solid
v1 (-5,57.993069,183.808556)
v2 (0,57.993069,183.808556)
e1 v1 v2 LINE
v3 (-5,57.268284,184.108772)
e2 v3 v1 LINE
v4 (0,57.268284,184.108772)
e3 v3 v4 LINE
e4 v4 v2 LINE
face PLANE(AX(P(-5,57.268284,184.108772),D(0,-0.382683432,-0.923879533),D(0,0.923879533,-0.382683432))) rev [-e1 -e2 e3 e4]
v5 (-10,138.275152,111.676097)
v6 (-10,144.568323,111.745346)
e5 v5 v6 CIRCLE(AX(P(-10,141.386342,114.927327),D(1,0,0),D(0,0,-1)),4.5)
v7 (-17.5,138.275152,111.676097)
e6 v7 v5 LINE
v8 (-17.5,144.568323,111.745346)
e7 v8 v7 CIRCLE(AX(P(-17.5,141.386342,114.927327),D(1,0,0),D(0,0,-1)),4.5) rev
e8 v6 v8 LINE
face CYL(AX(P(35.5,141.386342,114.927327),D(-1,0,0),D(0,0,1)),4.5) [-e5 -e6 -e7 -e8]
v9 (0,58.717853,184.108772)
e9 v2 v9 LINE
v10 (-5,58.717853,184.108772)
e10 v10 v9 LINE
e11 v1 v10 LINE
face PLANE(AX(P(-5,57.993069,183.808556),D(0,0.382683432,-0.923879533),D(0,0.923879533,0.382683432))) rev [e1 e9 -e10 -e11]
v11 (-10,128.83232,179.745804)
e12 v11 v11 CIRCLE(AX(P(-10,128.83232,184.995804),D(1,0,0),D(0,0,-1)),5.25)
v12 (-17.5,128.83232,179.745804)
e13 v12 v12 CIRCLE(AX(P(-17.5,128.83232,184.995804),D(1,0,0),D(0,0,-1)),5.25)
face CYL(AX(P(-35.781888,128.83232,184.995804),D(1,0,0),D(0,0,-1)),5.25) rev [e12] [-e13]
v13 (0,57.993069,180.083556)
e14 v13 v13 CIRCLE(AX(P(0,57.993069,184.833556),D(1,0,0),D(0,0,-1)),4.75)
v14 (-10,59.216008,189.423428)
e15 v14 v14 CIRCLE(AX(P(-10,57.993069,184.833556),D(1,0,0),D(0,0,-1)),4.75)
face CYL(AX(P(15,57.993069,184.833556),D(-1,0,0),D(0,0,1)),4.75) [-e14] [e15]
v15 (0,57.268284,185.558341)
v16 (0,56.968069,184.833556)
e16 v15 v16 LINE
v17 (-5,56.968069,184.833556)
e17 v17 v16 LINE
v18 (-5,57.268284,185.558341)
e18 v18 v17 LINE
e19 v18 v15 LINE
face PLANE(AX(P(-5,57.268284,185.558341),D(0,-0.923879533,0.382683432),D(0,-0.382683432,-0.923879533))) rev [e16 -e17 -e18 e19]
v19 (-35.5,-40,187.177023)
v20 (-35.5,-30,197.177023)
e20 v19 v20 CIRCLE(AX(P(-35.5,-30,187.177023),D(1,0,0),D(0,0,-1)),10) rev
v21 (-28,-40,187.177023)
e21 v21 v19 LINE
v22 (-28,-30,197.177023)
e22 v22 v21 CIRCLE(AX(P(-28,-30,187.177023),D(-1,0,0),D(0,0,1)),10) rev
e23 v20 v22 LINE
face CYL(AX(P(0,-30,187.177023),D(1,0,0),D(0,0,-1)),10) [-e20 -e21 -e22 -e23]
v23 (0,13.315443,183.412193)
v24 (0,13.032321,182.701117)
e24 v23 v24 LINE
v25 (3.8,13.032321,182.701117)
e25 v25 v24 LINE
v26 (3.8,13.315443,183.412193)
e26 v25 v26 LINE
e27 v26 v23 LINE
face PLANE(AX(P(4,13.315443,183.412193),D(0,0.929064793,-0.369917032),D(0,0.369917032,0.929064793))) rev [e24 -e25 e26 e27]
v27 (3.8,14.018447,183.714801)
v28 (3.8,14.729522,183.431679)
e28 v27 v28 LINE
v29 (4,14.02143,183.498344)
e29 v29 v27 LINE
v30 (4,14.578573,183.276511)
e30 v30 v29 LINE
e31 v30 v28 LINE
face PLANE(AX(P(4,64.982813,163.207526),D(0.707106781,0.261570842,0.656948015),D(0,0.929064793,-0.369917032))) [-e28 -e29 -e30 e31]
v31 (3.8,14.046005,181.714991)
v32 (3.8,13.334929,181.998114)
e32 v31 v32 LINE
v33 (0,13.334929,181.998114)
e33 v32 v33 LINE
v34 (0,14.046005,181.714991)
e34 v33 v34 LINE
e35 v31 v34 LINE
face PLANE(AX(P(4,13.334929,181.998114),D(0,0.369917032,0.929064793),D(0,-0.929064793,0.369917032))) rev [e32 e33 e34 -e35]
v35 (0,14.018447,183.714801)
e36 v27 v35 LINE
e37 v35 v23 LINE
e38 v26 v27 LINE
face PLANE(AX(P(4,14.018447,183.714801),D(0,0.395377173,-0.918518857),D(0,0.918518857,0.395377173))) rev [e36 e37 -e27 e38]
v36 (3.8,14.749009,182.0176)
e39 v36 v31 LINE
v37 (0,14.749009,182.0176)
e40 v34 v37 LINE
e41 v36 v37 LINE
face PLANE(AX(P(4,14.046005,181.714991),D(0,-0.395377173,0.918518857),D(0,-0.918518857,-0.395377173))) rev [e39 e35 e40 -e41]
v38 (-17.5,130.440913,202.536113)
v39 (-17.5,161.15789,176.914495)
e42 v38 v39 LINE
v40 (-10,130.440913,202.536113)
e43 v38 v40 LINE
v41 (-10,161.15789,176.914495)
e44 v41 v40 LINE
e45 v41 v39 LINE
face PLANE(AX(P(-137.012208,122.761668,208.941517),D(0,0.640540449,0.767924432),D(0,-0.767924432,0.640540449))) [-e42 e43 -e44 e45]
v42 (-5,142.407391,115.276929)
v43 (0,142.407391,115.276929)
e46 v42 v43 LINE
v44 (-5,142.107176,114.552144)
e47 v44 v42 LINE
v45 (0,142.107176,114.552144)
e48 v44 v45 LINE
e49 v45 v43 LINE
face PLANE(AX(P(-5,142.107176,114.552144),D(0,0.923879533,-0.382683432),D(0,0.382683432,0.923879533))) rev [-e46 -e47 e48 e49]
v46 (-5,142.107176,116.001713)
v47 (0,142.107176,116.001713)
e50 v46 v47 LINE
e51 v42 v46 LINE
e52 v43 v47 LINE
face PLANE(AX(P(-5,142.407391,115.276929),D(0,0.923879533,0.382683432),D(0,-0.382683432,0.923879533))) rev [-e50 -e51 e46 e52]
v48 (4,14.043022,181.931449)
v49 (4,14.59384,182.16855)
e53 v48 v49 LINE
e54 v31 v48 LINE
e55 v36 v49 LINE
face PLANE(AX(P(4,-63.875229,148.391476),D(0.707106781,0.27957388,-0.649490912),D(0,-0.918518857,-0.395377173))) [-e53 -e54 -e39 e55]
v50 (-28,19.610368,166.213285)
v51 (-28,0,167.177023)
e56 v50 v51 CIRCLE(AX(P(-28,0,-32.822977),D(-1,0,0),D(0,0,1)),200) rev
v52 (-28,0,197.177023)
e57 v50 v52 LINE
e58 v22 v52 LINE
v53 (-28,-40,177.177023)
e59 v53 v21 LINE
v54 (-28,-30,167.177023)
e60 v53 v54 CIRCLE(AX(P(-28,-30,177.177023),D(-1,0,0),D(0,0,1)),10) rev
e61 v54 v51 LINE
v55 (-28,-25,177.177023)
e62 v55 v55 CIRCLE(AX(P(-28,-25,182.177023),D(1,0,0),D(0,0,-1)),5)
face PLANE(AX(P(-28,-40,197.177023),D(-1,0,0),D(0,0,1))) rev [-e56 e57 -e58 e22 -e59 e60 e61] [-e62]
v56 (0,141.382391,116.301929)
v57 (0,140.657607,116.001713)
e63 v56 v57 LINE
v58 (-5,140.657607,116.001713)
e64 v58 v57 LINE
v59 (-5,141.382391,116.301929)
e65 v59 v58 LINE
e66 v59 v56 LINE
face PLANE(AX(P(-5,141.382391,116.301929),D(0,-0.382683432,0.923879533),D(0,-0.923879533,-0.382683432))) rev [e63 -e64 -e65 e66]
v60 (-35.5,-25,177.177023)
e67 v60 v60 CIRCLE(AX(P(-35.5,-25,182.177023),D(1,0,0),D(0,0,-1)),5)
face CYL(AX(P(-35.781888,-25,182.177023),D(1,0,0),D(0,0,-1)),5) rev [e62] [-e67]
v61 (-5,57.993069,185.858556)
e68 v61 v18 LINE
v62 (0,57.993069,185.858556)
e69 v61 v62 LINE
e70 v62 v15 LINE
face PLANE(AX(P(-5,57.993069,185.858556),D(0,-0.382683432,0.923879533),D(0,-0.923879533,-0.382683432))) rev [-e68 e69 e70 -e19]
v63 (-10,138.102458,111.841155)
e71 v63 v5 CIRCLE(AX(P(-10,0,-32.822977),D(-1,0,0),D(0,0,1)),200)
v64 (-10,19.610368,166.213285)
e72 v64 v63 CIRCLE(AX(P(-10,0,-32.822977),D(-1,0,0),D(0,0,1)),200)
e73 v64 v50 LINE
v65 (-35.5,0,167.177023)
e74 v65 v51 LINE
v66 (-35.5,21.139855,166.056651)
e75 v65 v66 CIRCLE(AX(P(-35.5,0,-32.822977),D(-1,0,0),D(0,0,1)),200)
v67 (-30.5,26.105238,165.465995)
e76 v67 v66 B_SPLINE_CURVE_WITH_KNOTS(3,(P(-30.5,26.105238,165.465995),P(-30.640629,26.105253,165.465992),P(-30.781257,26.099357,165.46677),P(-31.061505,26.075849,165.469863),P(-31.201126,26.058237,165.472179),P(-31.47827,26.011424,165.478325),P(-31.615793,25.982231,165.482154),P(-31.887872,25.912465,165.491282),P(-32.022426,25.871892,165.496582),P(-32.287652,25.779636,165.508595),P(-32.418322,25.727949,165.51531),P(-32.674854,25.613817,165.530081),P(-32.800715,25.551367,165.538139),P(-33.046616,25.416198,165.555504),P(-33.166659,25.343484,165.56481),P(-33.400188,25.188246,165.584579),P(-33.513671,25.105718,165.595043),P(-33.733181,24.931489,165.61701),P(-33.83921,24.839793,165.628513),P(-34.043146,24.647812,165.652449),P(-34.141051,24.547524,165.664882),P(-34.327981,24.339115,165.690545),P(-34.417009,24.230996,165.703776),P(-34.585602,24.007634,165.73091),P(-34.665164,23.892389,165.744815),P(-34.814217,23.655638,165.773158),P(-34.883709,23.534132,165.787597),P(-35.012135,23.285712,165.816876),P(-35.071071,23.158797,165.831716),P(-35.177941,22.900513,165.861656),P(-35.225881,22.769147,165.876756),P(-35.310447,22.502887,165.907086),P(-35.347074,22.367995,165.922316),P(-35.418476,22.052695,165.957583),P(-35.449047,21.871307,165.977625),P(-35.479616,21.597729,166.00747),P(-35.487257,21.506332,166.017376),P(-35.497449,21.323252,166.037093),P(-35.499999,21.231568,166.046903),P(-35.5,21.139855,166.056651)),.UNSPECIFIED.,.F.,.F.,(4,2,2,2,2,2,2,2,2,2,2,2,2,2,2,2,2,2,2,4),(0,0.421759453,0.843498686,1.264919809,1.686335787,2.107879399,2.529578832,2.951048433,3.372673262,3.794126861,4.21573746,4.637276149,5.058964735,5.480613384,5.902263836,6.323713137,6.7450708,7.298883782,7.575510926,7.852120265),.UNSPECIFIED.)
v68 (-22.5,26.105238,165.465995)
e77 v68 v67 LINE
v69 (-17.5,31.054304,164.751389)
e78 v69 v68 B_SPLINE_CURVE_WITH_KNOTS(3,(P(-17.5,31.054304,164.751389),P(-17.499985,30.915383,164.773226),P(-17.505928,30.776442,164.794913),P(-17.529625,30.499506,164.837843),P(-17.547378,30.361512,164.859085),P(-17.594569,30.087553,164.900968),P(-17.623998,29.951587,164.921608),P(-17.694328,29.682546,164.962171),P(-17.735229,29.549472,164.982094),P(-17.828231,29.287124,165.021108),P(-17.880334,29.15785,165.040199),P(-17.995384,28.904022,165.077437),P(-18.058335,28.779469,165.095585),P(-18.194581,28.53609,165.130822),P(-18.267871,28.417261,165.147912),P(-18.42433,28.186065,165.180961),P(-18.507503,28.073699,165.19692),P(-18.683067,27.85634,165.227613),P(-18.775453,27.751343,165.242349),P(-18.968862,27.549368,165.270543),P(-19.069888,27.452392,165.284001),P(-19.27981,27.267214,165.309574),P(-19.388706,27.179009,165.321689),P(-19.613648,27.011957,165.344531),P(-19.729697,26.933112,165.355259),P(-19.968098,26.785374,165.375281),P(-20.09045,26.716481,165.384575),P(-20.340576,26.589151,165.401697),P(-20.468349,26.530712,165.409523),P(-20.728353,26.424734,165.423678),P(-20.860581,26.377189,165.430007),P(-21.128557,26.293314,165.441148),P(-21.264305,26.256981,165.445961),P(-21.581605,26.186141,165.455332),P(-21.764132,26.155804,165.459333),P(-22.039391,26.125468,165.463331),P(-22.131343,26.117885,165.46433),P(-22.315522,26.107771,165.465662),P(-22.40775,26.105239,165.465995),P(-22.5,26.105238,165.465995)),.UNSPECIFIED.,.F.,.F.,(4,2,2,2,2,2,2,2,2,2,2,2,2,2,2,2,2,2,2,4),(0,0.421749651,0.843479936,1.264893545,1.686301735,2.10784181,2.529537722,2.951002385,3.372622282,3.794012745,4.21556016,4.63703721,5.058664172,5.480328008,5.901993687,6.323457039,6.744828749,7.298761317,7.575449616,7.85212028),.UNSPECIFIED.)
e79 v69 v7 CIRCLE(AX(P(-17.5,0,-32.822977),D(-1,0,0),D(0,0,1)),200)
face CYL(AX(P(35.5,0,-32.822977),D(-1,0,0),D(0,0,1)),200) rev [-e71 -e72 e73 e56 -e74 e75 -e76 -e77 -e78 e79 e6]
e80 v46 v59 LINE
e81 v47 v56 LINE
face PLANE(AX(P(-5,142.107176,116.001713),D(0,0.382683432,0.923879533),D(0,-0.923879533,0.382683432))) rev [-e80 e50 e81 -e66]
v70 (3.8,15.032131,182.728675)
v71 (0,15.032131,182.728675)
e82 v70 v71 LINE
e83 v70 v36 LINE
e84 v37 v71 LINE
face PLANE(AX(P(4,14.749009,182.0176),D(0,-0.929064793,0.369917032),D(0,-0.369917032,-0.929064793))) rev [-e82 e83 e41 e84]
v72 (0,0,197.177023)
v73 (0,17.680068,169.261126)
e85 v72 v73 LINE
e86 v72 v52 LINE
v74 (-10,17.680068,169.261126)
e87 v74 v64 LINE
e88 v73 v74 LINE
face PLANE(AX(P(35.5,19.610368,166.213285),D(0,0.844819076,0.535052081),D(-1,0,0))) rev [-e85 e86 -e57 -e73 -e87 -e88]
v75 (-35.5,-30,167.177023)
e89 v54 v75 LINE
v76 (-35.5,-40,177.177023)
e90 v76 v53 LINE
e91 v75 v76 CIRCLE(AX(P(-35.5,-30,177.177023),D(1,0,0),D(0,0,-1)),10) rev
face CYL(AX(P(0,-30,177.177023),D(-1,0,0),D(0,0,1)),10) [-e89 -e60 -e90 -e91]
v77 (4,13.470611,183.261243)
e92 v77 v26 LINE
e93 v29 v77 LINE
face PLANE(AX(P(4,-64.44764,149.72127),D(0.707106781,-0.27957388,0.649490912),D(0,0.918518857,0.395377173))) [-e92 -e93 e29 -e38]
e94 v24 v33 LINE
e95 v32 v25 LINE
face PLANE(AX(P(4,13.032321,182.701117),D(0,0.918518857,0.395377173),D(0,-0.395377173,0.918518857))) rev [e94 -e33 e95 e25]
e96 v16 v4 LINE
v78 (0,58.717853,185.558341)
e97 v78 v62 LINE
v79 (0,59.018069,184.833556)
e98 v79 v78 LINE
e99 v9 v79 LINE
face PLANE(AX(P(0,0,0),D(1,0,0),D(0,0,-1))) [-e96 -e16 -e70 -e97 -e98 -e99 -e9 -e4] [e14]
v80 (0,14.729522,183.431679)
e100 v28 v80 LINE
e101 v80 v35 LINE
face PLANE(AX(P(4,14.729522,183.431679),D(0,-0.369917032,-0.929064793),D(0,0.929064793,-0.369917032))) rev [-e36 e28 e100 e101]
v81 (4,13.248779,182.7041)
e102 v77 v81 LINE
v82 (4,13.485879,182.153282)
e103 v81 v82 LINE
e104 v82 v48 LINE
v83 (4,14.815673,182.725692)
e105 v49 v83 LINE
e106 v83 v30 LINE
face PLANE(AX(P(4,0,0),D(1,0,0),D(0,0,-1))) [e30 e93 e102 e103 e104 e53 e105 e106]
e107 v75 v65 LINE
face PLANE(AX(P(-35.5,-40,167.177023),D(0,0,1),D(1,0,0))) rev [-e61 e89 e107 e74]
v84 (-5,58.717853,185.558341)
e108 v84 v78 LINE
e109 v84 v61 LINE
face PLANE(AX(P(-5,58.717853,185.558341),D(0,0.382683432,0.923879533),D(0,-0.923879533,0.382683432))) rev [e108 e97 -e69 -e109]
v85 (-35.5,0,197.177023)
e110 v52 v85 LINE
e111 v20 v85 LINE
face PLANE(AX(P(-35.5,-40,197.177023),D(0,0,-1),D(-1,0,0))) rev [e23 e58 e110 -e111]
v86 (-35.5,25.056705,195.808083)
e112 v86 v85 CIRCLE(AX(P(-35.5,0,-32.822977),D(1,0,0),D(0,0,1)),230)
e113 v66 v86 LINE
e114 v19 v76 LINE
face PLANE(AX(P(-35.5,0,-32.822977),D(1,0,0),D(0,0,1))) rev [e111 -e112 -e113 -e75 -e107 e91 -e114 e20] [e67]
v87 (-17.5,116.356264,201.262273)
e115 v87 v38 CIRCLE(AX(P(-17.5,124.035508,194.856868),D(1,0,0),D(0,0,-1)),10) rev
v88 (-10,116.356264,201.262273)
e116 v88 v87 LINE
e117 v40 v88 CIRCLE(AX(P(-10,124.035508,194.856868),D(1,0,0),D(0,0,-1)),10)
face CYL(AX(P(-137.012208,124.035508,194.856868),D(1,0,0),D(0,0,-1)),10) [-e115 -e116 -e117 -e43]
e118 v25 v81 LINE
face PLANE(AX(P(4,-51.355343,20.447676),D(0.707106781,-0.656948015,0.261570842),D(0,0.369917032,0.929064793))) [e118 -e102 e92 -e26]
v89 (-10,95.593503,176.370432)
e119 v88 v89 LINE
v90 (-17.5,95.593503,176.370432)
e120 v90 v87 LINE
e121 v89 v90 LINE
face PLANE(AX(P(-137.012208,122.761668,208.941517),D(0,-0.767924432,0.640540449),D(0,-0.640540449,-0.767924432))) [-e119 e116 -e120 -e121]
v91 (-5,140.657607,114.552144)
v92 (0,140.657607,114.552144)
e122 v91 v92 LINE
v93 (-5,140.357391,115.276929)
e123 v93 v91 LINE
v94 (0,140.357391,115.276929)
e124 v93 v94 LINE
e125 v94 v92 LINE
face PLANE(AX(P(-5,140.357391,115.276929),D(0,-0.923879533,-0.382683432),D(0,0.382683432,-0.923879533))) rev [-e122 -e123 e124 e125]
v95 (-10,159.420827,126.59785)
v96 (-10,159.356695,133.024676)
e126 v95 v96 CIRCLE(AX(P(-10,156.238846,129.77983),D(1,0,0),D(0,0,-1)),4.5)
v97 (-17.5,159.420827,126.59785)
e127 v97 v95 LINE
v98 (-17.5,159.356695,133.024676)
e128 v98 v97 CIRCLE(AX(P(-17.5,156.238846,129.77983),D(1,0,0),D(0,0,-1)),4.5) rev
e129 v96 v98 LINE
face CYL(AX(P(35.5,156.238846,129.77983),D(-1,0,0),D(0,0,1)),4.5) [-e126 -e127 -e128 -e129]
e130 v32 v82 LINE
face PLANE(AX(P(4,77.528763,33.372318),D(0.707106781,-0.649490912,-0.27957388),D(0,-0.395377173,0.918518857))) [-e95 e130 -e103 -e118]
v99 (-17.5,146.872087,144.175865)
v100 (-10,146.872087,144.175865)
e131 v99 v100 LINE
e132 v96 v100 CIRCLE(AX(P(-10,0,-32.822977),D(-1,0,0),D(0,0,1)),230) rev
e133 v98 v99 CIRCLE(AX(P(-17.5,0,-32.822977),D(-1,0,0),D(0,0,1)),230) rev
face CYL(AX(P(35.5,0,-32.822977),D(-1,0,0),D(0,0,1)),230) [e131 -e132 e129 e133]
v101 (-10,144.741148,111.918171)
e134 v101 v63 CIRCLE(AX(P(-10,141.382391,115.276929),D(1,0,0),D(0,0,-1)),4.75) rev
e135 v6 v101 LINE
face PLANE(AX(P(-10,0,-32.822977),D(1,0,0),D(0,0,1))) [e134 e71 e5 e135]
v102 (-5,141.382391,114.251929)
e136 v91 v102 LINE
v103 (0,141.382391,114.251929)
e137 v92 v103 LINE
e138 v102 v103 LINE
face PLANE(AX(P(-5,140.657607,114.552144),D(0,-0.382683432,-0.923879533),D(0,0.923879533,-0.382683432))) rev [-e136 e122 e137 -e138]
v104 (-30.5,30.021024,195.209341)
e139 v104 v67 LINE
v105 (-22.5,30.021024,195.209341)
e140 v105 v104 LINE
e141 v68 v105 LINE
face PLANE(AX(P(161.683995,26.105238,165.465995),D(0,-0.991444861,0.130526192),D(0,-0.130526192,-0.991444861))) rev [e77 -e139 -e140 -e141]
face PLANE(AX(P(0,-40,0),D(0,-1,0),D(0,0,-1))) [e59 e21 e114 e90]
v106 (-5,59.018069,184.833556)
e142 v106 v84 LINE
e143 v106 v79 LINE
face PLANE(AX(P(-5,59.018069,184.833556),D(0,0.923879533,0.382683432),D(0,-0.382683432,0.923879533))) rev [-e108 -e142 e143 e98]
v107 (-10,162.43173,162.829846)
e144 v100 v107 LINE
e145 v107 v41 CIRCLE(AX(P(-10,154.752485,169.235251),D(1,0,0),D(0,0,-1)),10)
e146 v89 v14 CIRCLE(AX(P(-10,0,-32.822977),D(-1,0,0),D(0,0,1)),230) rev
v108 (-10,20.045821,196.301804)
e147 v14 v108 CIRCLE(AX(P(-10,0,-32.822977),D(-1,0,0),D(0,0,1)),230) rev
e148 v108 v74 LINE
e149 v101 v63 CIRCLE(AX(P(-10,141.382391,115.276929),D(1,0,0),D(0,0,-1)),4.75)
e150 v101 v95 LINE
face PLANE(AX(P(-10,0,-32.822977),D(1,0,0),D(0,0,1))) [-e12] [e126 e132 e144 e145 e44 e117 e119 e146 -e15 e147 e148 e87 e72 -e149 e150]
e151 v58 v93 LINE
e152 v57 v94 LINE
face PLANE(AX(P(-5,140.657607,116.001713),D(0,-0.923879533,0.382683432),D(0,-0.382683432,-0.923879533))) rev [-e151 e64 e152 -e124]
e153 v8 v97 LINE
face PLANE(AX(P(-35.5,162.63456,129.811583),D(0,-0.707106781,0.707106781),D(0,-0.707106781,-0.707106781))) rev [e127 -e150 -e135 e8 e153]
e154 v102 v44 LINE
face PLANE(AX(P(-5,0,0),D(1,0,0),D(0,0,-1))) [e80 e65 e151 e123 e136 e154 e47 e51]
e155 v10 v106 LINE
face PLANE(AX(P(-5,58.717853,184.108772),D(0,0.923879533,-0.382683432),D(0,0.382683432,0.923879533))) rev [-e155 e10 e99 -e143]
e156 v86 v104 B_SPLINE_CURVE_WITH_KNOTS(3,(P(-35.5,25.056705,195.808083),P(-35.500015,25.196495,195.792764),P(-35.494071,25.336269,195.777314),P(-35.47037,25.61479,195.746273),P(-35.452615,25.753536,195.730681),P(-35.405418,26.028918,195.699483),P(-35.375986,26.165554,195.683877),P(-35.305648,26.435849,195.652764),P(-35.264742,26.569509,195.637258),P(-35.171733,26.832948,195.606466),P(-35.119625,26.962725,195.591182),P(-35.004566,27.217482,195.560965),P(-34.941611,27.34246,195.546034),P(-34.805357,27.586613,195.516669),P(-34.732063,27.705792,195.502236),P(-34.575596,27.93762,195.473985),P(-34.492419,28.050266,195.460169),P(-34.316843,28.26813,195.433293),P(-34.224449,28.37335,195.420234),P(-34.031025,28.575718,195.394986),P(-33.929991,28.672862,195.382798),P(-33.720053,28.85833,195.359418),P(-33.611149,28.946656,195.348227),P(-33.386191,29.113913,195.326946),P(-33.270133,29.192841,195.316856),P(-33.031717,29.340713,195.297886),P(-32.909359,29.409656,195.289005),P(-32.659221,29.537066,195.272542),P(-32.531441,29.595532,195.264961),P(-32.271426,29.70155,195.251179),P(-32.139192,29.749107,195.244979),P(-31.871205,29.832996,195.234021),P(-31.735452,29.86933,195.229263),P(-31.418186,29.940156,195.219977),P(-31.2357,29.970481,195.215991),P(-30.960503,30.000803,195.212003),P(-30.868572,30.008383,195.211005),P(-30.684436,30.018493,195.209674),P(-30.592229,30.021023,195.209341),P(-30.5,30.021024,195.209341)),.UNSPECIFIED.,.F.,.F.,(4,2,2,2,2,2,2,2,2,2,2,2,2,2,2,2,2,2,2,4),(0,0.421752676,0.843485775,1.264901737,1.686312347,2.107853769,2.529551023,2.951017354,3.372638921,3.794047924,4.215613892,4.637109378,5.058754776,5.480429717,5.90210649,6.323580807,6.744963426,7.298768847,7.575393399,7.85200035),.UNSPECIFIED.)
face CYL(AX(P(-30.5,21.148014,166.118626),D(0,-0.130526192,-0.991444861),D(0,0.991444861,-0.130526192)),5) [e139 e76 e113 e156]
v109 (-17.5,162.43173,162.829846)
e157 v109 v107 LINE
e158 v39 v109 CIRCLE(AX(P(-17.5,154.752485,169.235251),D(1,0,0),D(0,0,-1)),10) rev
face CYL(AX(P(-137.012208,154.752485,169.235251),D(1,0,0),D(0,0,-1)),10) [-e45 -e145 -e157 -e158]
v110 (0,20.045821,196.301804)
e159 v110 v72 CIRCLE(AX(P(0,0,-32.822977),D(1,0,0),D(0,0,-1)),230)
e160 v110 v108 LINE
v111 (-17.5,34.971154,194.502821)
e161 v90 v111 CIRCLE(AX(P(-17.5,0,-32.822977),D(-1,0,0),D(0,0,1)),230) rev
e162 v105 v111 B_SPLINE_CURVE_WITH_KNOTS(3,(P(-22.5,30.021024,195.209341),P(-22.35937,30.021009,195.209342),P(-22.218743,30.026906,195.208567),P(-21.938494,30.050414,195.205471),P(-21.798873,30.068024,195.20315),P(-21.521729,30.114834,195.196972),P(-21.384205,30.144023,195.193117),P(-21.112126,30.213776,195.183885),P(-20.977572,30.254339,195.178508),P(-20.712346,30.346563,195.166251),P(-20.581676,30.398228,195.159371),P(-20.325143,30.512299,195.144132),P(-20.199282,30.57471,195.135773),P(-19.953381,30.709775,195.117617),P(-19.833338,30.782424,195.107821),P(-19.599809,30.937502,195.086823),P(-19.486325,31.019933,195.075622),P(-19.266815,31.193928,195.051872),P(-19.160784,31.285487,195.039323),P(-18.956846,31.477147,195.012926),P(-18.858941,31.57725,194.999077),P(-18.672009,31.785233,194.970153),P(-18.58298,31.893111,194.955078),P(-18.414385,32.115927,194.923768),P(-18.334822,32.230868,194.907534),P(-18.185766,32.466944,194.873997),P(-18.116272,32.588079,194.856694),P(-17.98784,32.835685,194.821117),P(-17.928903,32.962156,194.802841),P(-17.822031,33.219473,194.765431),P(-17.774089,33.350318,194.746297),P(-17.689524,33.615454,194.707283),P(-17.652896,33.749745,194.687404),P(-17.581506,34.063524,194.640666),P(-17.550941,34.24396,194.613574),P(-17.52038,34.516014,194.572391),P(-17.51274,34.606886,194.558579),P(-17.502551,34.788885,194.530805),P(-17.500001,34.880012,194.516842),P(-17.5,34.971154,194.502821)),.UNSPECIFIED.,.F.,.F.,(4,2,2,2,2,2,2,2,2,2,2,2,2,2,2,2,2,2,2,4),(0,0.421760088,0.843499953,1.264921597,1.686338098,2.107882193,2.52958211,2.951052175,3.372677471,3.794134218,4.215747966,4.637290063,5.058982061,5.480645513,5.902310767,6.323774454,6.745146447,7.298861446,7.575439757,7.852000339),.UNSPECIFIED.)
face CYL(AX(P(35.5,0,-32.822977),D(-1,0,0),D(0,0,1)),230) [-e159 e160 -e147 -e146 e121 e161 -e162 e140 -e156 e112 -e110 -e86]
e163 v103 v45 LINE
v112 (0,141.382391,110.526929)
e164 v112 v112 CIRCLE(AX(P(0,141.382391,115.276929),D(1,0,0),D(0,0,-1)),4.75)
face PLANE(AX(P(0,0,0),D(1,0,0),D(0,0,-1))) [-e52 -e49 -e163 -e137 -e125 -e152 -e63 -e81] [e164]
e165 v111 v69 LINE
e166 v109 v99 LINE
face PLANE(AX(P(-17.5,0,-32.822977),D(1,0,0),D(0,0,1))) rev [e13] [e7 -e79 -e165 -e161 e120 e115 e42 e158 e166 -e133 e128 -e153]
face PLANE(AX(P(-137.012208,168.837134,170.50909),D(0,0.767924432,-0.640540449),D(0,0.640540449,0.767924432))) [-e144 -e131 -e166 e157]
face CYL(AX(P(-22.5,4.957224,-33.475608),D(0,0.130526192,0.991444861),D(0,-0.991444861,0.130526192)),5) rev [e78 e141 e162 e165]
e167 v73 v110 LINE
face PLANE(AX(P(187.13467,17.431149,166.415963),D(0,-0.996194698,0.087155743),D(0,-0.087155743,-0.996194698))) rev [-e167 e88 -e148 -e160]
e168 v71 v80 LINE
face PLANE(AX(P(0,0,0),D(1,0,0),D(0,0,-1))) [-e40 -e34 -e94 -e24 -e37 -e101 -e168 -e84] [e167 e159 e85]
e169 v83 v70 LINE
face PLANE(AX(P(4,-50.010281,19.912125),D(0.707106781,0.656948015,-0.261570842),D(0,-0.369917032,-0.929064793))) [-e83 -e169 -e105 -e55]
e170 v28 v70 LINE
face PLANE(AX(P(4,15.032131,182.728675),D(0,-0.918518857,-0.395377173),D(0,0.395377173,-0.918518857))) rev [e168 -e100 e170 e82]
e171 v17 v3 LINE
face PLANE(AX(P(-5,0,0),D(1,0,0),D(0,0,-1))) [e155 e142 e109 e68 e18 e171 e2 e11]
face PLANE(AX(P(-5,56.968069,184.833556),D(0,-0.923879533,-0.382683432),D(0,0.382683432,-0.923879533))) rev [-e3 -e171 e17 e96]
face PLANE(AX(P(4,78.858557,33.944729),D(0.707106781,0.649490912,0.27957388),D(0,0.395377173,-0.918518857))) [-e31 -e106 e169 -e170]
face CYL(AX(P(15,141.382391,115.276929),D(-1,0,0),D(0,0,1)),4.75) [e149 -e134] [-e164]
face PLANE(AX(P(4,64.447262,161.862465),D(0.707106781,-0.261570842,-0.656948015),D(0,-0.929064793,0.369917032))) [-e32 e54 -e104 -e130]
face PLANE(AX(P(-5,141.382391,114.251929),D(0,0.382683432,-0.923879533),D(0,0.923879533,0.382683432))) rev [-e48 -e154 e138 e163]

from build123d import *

# Parameters (mm, degrees)
CURVE_MAIN_BODY_DEPTH        = 35.5
CUT_EXTRUDE2_START           = -18
CUT_EXTRUDE2_DEPTH           = 18
CUT_EXTRUDE3_DEPTH           = 10
FILLET3_R                    = 5
FILLET3_OF_MIRROR3_R         = 5
SKETCH14_W                   = 7.5
SKETCH14_H                   = 30
BOSS_EXTRUDE9_DEPTH          = 40
SKETCH17_R                   = 4.75
BOSS_EXTRUDE6_DEPTH          = 25
BOSS_EXTRUDE7_DEPTH          = 7.5
SKETCH21_W                   = 105.177079877
SKETCH21_H                   = 219.768987876
CUT_EXTRUDE5_DEPTH           = 271.966391894
CHAMFER2_SIZE                = 30
SKETCH22_R                   = 5
BICEPS_CONNECTION_HOLE_DEPTH = 271.086163168
SERVO_HOLE_DEPTH             = 270.838443396
SERVO_HOLE_DEPTH_BACK        = 270.838443396
SKETCH19_R                   = 5.25
FEMALE_JACK_DEPTH            = 5
MALE_JACK_DEPTH              = 4
CHAMFER3_SIZE                = 0.2
BICEPS_CONNECTION_FILLET_R   = 10
BOW_CONNECTION_FILLET_R      = 4.5
SERVO_HOLE_FILLET_R          = 10


with BuildPart() as part:
    # Sketch2 → Curve Main Body (new body)
    with BuildSketch(Plane(origin=(0, 0, 0), x_dir=(0, 0, -1), z_dir=(1, 0, 0))):
        with BuildLine():
            Line((-197.17702304, 0), (-167.17702304, 0))
            ThreePointArc((-167.17702304, 0), (-151.952929542, 76.536686473), (-108.598379277, 141.421356237))
            Line((-108.598379277, 141.421356237), (-129.811582713, 162.634559673))
            ThreePointArc((-129.811582713, 162.634559673), (-179.669315518, 88.017189444), (-197.17702304, 0))
        make_face()
    curve_main_body = extrude(amount=CURVE_MAIN_BODY_DEPTH)

    # Sketch6 → Cut-Extrude2 (cut)
    with BuildSketch(Plane(origin=(35.5, 0, 0), x_dir=(0, 0, -1), z_dir=(1, 0, 0)).offset(CUT_EXTRUDE2_START)):
        with BuildLine():
            Line((-165.465995315, 26.105238444), (-195.209341156, 30.021024211))
            ThreePointArc((-195.209341156, 30.021024211), (-173.457753593, 101.72639875), (-129.811582713, 162.634559673))
            Line((-129.811582713, 162.634559673), (-108.598379277, 141.421356237))
            ThreePointArc((-108.598379277, 141.421356237), (-146.551571347, 88.457738044), (-165.465995315, 26.105238444))
        make_face()
    cut_extrude2 = extrude(amount=CUT_EXTRUDE2_DEPTH, mode=Mode.SUBTRACT)

    # Sketch7 → Cut-Extrude3 (cut)
    with BuildSketch(Plane.ZY):
        with BuildLine():
            Line((166.415962658, 17.43114855), (196.301803601, 20.045820832))
            ThreePointArc((196.301803601, 20.045820832), (175.627814058, 97.2022002), (129.811582713, 162.634559673))
            Line((129.811582713, 162.634559673), (108.598379277, 141.421356237))
            ThreePointArc((108.598379277, 141.421356237), (148.438580447, 84.523652348), (166.415962658, 17.43114855))
        make_face()
    cut_extrude3 = extrude(amount=-CUT_EXTRUDE3_DEPTH, mode=Mode.SUBTRACT)

    # Fillet3
    fillet3_edges = [part.edges().sort_by_distance(p)[0] for p in [
        (35.5, 28.063131327, 180.337668235),
        (17.5, 28.063131327, 180.337668235),
    ]]
    fillet(fillet3_edges, radius=FILLET3_R)

    # Mirror3: Curve Main Body, Cut-Extrude2, Cut-Extrude3 across plane
    add(curve_main_body.mirror(Plane(origin=(0, 0, -32.82297696), x_dir=(0, 0, 1), z_dir=(-1, 0, 0))))
    add(cut_extrude2.mirror(Plane(origin=(0, 0, -32.82297696), x_dir=(0, 0, 1), z_dir=(-1, 0, 0))), mode=Mode.SUBTRACT)
    add(cut_extrude3.mirror(Plane(origin=(0, 0, -32.82297696), x_dir=(0, 0, 1), z_dir=(-1, 0, 0))), mode=Mode.SUBTRACT)

    # Fillet3 of Mirror3
    fillet3_of_mirror3_edges = [part.edges().sort_by_distance(p)[0] for p in [
        (-35.5, 28.063131327, 180.337668235),
        (-17.5, 28.063131327, 180.337668235),
    ]]
    fillet(fillet3_of_mirror3_edges, radius=FILLET3_OF_MIRROR3_R)

    # Sketch14 → Boss-Extrude9 (add)
    with BuildSketch(Plane.XZ):
        with Locations((-31.75, 182.17702304)):
            Rectangle(SKETCH14_W, SKETCH14_H)
        with Locations((31.75, 182.17702304)):
            Rectangle(SKETCH14_W, SKETCH14_H)
    extrude(amount=BOSS_EXTRUDE9_DEPTH)

    # Sketch17 → Boss-Extrude6 (add)
    with BuildSketch(Plane(origin=(-10, 0, 0), x_dir=(0, 0, -1), z_dir=(1, 0, 0))):
        with Locations(Location((-115.276928512, 141.382391051, 0), (0, 0, 45))):
            Circle(SKETCH17_R)
        with Locations(Location((-184.833556277, 57.993068891, 0), (0, 0, 165.080977231))):
            Circle(SKETCH17_R)
    extrude(amount=BOSS_EXTRUDE6_DEPTH)

    # Sketch18 → Boss-Extrude7 (add)
    with BuildSketch(Plane(origin=(-10, 0, 0), x_dir=(0, 0, -1), z_dir=(1, 0, 0))):
        Polygon((-208.94151729, 122.761668275), (-162.866051375, 84.329241332), (-124.433624432, 130.404707247), (-170.509090347, 168.83713419), align=None)
    extrude(amount=-BOSS_EXTRUDE7_DEPTH)

    # Sketch21 → Cut-Extrude5 (cut, through all)
    with BuildSketch(Plane(origin=(0, 0, 0), x_dir=(0, 0, -1), z_dir=(1, 0, 0))):
        with Locations((-156.96960977, 61.310905927)):
            Rectangle(SKETCH21_W, SKETCH21_H)
    extrude(amount=CUT_EXTRUDE5_DEPTH, mode=Mode.SUBTRACT)

    # Chamfer2
    # the kernel refuses this chamfer: 30, 19 mm, written as the material it takes off along each edge
    with BuildSketch(Plane(origin=(-28, 0, 167.17702304), x_dir=(0, 0, 1), z_dir=(1, 0, 0))) as chamfer2_piece_1:
        with BuildLine():
            Line((CHAMFER2_SIZE, 0), (-0.963738269, -19.610367571))
            ThreePointArc((-0.963738269, -19.610367571), (-0.258402539, -10.163377571), (0, 0))
            Line((0, 0), (CHAMFER2_SIZE, 0))
        make_face()
    extrude(amount=105.551070811, mode=Mode.SUBTRACT)

    # Sketch22 → Biceps Connection Hole (cut, through all)
    with BuildSketch(Plane(origin=(-28, 0, 0), x_dir=(0, 0, -1), z_dir=(1, 0, 0))):
        with Locations((-182.17702304, -25)):
            Circle(SKETCH22_R)
    extrude(amount=-BICEPS_CONNECTION_HOLE_DEPTH, mode=Mode.SUBTRACT)

    # Sketch19 → Servo Hole (cut, two sides: drawn at the far end of the back side and taken through both)
    with BuildSketch(Plane(origin=(-10, 0, 0), x_dir=(0, 0, -1), z_dir=(1, 0, 0)).offset(-SERVO_HOLE_DEPTH_BACK)):
        with Locations((-184.995804047, 128.832320402)):
            Circle(SKETCH19_R)
    extrude(amount=SERVO_HOLE_DEPTH + SERVO_HOLE_DEPTH_BACK, mode=Mode.SUBTRACT)

    # Sketch23 → Female Jack (cut)
    with BuildSketch(Plane(origin=(0, 0, 0), x_dir=(0, 0, -1), z_dir=(1, 0, 0))):
        Polygon((-115.276928512, 140.357391051), (-114.552144061, 140.6576066), (-114.251928512, 141.382391051), (-114.552144061, 142.107175501), (-115.276928512, 142.407391051), (-116.001712963, 142.107175501), (-116.301928512, 141.382391051), (-116.001712963, 140.6576066), align=None)
        Polygon((-184.833556277, 59.018068891), (-185.558340728, 58.717853341), (-185.858556277, 57.993068891), (-185.558340728, 57.26828444), (-184.833556277, 56.968068891), (-184.108771826, 57.26828444), (-183.808556277, 57.993068891), (-184.108771826, 58.717853341), align=None)
    extrude(amount=-FEMALE_JACK_DEPTH, mode=Mode.SUBTRACT)

    # Sketch25 → Male Jack (add)
    with BuildSketch(Plane(origin=(0, 0, 0), x_dir=(0, 0, -1), z_dir=(1, 0, 0))):
        Polygon((-182.728675304, 15.032130751), (-183.431679202, 14.729522163), (-183.714801441, 14.018446755), (-183.412192854, 13.315442858), (-182.701117446, 13.032320619), (-181.998113548, 13.334929206), (-181.714991309, 14.046004614), (-182.017599897, 14.749008512), align=None)
    extrude(amount=MALE_JACK_DEPTH)

    # Chamfer3
    chamfer3_edges = [part.edges().sort_by_distance(p)[0] for p in [
        (4, 14.890569631, 182.373137601),
        (4, 14.880826457, 183.080177253),
        (4, 14.373984459, 183.573240322),
        (4, 13.666944806, 183.563497147),
        (4, 13.173881738, 183.05665515),
        (4, 13.183624912, 182.349615497),
        (4, 13.69046691, 181.856552429),
        (4, 14.397506563, 181.866295603),
    ]]
    chamfer(chamfer3_edges, length=CHAMFER3_SIZE)

    # Biceps Connection Fillet
    biceps_connection_fillet_edges = [part.edges().sort_by_distance(p)[0] for p in [
        (-31.75, -40, 167.17702304),
        (-31.75, -40, 197.17702304),
    ]]
    fillet(biceps_connection_fillet_edges, radius=BICEPS_CONNECTION_FILLET_R)

    # Bow Connection Fillet
    bow_connection_fillet_edges = [part.edges().sort_by_distance(p)[0] for p in [
        (-13.75, 162.634559673, 129.811582713),
        (-13.75, 141.421356237, 108.598379277),
    ]]
    fillet(bow_connection_fillet_edges, radius=BOW_CONNECTION_FILLET_R)

    # Servo Hole Fillet
    servo_hole_fillet_edges = [part.edges().sort_by_distance(p)[0] for p in [
        (-13.75, 168.83713419, 170.509090347),
        (-13.75, 122.761668275, 208.94151729),
    ]]
    fillet(servo_hole_fillet_edges, radius=SERVO_HOLE_FILLET_R)


solid = part.part
